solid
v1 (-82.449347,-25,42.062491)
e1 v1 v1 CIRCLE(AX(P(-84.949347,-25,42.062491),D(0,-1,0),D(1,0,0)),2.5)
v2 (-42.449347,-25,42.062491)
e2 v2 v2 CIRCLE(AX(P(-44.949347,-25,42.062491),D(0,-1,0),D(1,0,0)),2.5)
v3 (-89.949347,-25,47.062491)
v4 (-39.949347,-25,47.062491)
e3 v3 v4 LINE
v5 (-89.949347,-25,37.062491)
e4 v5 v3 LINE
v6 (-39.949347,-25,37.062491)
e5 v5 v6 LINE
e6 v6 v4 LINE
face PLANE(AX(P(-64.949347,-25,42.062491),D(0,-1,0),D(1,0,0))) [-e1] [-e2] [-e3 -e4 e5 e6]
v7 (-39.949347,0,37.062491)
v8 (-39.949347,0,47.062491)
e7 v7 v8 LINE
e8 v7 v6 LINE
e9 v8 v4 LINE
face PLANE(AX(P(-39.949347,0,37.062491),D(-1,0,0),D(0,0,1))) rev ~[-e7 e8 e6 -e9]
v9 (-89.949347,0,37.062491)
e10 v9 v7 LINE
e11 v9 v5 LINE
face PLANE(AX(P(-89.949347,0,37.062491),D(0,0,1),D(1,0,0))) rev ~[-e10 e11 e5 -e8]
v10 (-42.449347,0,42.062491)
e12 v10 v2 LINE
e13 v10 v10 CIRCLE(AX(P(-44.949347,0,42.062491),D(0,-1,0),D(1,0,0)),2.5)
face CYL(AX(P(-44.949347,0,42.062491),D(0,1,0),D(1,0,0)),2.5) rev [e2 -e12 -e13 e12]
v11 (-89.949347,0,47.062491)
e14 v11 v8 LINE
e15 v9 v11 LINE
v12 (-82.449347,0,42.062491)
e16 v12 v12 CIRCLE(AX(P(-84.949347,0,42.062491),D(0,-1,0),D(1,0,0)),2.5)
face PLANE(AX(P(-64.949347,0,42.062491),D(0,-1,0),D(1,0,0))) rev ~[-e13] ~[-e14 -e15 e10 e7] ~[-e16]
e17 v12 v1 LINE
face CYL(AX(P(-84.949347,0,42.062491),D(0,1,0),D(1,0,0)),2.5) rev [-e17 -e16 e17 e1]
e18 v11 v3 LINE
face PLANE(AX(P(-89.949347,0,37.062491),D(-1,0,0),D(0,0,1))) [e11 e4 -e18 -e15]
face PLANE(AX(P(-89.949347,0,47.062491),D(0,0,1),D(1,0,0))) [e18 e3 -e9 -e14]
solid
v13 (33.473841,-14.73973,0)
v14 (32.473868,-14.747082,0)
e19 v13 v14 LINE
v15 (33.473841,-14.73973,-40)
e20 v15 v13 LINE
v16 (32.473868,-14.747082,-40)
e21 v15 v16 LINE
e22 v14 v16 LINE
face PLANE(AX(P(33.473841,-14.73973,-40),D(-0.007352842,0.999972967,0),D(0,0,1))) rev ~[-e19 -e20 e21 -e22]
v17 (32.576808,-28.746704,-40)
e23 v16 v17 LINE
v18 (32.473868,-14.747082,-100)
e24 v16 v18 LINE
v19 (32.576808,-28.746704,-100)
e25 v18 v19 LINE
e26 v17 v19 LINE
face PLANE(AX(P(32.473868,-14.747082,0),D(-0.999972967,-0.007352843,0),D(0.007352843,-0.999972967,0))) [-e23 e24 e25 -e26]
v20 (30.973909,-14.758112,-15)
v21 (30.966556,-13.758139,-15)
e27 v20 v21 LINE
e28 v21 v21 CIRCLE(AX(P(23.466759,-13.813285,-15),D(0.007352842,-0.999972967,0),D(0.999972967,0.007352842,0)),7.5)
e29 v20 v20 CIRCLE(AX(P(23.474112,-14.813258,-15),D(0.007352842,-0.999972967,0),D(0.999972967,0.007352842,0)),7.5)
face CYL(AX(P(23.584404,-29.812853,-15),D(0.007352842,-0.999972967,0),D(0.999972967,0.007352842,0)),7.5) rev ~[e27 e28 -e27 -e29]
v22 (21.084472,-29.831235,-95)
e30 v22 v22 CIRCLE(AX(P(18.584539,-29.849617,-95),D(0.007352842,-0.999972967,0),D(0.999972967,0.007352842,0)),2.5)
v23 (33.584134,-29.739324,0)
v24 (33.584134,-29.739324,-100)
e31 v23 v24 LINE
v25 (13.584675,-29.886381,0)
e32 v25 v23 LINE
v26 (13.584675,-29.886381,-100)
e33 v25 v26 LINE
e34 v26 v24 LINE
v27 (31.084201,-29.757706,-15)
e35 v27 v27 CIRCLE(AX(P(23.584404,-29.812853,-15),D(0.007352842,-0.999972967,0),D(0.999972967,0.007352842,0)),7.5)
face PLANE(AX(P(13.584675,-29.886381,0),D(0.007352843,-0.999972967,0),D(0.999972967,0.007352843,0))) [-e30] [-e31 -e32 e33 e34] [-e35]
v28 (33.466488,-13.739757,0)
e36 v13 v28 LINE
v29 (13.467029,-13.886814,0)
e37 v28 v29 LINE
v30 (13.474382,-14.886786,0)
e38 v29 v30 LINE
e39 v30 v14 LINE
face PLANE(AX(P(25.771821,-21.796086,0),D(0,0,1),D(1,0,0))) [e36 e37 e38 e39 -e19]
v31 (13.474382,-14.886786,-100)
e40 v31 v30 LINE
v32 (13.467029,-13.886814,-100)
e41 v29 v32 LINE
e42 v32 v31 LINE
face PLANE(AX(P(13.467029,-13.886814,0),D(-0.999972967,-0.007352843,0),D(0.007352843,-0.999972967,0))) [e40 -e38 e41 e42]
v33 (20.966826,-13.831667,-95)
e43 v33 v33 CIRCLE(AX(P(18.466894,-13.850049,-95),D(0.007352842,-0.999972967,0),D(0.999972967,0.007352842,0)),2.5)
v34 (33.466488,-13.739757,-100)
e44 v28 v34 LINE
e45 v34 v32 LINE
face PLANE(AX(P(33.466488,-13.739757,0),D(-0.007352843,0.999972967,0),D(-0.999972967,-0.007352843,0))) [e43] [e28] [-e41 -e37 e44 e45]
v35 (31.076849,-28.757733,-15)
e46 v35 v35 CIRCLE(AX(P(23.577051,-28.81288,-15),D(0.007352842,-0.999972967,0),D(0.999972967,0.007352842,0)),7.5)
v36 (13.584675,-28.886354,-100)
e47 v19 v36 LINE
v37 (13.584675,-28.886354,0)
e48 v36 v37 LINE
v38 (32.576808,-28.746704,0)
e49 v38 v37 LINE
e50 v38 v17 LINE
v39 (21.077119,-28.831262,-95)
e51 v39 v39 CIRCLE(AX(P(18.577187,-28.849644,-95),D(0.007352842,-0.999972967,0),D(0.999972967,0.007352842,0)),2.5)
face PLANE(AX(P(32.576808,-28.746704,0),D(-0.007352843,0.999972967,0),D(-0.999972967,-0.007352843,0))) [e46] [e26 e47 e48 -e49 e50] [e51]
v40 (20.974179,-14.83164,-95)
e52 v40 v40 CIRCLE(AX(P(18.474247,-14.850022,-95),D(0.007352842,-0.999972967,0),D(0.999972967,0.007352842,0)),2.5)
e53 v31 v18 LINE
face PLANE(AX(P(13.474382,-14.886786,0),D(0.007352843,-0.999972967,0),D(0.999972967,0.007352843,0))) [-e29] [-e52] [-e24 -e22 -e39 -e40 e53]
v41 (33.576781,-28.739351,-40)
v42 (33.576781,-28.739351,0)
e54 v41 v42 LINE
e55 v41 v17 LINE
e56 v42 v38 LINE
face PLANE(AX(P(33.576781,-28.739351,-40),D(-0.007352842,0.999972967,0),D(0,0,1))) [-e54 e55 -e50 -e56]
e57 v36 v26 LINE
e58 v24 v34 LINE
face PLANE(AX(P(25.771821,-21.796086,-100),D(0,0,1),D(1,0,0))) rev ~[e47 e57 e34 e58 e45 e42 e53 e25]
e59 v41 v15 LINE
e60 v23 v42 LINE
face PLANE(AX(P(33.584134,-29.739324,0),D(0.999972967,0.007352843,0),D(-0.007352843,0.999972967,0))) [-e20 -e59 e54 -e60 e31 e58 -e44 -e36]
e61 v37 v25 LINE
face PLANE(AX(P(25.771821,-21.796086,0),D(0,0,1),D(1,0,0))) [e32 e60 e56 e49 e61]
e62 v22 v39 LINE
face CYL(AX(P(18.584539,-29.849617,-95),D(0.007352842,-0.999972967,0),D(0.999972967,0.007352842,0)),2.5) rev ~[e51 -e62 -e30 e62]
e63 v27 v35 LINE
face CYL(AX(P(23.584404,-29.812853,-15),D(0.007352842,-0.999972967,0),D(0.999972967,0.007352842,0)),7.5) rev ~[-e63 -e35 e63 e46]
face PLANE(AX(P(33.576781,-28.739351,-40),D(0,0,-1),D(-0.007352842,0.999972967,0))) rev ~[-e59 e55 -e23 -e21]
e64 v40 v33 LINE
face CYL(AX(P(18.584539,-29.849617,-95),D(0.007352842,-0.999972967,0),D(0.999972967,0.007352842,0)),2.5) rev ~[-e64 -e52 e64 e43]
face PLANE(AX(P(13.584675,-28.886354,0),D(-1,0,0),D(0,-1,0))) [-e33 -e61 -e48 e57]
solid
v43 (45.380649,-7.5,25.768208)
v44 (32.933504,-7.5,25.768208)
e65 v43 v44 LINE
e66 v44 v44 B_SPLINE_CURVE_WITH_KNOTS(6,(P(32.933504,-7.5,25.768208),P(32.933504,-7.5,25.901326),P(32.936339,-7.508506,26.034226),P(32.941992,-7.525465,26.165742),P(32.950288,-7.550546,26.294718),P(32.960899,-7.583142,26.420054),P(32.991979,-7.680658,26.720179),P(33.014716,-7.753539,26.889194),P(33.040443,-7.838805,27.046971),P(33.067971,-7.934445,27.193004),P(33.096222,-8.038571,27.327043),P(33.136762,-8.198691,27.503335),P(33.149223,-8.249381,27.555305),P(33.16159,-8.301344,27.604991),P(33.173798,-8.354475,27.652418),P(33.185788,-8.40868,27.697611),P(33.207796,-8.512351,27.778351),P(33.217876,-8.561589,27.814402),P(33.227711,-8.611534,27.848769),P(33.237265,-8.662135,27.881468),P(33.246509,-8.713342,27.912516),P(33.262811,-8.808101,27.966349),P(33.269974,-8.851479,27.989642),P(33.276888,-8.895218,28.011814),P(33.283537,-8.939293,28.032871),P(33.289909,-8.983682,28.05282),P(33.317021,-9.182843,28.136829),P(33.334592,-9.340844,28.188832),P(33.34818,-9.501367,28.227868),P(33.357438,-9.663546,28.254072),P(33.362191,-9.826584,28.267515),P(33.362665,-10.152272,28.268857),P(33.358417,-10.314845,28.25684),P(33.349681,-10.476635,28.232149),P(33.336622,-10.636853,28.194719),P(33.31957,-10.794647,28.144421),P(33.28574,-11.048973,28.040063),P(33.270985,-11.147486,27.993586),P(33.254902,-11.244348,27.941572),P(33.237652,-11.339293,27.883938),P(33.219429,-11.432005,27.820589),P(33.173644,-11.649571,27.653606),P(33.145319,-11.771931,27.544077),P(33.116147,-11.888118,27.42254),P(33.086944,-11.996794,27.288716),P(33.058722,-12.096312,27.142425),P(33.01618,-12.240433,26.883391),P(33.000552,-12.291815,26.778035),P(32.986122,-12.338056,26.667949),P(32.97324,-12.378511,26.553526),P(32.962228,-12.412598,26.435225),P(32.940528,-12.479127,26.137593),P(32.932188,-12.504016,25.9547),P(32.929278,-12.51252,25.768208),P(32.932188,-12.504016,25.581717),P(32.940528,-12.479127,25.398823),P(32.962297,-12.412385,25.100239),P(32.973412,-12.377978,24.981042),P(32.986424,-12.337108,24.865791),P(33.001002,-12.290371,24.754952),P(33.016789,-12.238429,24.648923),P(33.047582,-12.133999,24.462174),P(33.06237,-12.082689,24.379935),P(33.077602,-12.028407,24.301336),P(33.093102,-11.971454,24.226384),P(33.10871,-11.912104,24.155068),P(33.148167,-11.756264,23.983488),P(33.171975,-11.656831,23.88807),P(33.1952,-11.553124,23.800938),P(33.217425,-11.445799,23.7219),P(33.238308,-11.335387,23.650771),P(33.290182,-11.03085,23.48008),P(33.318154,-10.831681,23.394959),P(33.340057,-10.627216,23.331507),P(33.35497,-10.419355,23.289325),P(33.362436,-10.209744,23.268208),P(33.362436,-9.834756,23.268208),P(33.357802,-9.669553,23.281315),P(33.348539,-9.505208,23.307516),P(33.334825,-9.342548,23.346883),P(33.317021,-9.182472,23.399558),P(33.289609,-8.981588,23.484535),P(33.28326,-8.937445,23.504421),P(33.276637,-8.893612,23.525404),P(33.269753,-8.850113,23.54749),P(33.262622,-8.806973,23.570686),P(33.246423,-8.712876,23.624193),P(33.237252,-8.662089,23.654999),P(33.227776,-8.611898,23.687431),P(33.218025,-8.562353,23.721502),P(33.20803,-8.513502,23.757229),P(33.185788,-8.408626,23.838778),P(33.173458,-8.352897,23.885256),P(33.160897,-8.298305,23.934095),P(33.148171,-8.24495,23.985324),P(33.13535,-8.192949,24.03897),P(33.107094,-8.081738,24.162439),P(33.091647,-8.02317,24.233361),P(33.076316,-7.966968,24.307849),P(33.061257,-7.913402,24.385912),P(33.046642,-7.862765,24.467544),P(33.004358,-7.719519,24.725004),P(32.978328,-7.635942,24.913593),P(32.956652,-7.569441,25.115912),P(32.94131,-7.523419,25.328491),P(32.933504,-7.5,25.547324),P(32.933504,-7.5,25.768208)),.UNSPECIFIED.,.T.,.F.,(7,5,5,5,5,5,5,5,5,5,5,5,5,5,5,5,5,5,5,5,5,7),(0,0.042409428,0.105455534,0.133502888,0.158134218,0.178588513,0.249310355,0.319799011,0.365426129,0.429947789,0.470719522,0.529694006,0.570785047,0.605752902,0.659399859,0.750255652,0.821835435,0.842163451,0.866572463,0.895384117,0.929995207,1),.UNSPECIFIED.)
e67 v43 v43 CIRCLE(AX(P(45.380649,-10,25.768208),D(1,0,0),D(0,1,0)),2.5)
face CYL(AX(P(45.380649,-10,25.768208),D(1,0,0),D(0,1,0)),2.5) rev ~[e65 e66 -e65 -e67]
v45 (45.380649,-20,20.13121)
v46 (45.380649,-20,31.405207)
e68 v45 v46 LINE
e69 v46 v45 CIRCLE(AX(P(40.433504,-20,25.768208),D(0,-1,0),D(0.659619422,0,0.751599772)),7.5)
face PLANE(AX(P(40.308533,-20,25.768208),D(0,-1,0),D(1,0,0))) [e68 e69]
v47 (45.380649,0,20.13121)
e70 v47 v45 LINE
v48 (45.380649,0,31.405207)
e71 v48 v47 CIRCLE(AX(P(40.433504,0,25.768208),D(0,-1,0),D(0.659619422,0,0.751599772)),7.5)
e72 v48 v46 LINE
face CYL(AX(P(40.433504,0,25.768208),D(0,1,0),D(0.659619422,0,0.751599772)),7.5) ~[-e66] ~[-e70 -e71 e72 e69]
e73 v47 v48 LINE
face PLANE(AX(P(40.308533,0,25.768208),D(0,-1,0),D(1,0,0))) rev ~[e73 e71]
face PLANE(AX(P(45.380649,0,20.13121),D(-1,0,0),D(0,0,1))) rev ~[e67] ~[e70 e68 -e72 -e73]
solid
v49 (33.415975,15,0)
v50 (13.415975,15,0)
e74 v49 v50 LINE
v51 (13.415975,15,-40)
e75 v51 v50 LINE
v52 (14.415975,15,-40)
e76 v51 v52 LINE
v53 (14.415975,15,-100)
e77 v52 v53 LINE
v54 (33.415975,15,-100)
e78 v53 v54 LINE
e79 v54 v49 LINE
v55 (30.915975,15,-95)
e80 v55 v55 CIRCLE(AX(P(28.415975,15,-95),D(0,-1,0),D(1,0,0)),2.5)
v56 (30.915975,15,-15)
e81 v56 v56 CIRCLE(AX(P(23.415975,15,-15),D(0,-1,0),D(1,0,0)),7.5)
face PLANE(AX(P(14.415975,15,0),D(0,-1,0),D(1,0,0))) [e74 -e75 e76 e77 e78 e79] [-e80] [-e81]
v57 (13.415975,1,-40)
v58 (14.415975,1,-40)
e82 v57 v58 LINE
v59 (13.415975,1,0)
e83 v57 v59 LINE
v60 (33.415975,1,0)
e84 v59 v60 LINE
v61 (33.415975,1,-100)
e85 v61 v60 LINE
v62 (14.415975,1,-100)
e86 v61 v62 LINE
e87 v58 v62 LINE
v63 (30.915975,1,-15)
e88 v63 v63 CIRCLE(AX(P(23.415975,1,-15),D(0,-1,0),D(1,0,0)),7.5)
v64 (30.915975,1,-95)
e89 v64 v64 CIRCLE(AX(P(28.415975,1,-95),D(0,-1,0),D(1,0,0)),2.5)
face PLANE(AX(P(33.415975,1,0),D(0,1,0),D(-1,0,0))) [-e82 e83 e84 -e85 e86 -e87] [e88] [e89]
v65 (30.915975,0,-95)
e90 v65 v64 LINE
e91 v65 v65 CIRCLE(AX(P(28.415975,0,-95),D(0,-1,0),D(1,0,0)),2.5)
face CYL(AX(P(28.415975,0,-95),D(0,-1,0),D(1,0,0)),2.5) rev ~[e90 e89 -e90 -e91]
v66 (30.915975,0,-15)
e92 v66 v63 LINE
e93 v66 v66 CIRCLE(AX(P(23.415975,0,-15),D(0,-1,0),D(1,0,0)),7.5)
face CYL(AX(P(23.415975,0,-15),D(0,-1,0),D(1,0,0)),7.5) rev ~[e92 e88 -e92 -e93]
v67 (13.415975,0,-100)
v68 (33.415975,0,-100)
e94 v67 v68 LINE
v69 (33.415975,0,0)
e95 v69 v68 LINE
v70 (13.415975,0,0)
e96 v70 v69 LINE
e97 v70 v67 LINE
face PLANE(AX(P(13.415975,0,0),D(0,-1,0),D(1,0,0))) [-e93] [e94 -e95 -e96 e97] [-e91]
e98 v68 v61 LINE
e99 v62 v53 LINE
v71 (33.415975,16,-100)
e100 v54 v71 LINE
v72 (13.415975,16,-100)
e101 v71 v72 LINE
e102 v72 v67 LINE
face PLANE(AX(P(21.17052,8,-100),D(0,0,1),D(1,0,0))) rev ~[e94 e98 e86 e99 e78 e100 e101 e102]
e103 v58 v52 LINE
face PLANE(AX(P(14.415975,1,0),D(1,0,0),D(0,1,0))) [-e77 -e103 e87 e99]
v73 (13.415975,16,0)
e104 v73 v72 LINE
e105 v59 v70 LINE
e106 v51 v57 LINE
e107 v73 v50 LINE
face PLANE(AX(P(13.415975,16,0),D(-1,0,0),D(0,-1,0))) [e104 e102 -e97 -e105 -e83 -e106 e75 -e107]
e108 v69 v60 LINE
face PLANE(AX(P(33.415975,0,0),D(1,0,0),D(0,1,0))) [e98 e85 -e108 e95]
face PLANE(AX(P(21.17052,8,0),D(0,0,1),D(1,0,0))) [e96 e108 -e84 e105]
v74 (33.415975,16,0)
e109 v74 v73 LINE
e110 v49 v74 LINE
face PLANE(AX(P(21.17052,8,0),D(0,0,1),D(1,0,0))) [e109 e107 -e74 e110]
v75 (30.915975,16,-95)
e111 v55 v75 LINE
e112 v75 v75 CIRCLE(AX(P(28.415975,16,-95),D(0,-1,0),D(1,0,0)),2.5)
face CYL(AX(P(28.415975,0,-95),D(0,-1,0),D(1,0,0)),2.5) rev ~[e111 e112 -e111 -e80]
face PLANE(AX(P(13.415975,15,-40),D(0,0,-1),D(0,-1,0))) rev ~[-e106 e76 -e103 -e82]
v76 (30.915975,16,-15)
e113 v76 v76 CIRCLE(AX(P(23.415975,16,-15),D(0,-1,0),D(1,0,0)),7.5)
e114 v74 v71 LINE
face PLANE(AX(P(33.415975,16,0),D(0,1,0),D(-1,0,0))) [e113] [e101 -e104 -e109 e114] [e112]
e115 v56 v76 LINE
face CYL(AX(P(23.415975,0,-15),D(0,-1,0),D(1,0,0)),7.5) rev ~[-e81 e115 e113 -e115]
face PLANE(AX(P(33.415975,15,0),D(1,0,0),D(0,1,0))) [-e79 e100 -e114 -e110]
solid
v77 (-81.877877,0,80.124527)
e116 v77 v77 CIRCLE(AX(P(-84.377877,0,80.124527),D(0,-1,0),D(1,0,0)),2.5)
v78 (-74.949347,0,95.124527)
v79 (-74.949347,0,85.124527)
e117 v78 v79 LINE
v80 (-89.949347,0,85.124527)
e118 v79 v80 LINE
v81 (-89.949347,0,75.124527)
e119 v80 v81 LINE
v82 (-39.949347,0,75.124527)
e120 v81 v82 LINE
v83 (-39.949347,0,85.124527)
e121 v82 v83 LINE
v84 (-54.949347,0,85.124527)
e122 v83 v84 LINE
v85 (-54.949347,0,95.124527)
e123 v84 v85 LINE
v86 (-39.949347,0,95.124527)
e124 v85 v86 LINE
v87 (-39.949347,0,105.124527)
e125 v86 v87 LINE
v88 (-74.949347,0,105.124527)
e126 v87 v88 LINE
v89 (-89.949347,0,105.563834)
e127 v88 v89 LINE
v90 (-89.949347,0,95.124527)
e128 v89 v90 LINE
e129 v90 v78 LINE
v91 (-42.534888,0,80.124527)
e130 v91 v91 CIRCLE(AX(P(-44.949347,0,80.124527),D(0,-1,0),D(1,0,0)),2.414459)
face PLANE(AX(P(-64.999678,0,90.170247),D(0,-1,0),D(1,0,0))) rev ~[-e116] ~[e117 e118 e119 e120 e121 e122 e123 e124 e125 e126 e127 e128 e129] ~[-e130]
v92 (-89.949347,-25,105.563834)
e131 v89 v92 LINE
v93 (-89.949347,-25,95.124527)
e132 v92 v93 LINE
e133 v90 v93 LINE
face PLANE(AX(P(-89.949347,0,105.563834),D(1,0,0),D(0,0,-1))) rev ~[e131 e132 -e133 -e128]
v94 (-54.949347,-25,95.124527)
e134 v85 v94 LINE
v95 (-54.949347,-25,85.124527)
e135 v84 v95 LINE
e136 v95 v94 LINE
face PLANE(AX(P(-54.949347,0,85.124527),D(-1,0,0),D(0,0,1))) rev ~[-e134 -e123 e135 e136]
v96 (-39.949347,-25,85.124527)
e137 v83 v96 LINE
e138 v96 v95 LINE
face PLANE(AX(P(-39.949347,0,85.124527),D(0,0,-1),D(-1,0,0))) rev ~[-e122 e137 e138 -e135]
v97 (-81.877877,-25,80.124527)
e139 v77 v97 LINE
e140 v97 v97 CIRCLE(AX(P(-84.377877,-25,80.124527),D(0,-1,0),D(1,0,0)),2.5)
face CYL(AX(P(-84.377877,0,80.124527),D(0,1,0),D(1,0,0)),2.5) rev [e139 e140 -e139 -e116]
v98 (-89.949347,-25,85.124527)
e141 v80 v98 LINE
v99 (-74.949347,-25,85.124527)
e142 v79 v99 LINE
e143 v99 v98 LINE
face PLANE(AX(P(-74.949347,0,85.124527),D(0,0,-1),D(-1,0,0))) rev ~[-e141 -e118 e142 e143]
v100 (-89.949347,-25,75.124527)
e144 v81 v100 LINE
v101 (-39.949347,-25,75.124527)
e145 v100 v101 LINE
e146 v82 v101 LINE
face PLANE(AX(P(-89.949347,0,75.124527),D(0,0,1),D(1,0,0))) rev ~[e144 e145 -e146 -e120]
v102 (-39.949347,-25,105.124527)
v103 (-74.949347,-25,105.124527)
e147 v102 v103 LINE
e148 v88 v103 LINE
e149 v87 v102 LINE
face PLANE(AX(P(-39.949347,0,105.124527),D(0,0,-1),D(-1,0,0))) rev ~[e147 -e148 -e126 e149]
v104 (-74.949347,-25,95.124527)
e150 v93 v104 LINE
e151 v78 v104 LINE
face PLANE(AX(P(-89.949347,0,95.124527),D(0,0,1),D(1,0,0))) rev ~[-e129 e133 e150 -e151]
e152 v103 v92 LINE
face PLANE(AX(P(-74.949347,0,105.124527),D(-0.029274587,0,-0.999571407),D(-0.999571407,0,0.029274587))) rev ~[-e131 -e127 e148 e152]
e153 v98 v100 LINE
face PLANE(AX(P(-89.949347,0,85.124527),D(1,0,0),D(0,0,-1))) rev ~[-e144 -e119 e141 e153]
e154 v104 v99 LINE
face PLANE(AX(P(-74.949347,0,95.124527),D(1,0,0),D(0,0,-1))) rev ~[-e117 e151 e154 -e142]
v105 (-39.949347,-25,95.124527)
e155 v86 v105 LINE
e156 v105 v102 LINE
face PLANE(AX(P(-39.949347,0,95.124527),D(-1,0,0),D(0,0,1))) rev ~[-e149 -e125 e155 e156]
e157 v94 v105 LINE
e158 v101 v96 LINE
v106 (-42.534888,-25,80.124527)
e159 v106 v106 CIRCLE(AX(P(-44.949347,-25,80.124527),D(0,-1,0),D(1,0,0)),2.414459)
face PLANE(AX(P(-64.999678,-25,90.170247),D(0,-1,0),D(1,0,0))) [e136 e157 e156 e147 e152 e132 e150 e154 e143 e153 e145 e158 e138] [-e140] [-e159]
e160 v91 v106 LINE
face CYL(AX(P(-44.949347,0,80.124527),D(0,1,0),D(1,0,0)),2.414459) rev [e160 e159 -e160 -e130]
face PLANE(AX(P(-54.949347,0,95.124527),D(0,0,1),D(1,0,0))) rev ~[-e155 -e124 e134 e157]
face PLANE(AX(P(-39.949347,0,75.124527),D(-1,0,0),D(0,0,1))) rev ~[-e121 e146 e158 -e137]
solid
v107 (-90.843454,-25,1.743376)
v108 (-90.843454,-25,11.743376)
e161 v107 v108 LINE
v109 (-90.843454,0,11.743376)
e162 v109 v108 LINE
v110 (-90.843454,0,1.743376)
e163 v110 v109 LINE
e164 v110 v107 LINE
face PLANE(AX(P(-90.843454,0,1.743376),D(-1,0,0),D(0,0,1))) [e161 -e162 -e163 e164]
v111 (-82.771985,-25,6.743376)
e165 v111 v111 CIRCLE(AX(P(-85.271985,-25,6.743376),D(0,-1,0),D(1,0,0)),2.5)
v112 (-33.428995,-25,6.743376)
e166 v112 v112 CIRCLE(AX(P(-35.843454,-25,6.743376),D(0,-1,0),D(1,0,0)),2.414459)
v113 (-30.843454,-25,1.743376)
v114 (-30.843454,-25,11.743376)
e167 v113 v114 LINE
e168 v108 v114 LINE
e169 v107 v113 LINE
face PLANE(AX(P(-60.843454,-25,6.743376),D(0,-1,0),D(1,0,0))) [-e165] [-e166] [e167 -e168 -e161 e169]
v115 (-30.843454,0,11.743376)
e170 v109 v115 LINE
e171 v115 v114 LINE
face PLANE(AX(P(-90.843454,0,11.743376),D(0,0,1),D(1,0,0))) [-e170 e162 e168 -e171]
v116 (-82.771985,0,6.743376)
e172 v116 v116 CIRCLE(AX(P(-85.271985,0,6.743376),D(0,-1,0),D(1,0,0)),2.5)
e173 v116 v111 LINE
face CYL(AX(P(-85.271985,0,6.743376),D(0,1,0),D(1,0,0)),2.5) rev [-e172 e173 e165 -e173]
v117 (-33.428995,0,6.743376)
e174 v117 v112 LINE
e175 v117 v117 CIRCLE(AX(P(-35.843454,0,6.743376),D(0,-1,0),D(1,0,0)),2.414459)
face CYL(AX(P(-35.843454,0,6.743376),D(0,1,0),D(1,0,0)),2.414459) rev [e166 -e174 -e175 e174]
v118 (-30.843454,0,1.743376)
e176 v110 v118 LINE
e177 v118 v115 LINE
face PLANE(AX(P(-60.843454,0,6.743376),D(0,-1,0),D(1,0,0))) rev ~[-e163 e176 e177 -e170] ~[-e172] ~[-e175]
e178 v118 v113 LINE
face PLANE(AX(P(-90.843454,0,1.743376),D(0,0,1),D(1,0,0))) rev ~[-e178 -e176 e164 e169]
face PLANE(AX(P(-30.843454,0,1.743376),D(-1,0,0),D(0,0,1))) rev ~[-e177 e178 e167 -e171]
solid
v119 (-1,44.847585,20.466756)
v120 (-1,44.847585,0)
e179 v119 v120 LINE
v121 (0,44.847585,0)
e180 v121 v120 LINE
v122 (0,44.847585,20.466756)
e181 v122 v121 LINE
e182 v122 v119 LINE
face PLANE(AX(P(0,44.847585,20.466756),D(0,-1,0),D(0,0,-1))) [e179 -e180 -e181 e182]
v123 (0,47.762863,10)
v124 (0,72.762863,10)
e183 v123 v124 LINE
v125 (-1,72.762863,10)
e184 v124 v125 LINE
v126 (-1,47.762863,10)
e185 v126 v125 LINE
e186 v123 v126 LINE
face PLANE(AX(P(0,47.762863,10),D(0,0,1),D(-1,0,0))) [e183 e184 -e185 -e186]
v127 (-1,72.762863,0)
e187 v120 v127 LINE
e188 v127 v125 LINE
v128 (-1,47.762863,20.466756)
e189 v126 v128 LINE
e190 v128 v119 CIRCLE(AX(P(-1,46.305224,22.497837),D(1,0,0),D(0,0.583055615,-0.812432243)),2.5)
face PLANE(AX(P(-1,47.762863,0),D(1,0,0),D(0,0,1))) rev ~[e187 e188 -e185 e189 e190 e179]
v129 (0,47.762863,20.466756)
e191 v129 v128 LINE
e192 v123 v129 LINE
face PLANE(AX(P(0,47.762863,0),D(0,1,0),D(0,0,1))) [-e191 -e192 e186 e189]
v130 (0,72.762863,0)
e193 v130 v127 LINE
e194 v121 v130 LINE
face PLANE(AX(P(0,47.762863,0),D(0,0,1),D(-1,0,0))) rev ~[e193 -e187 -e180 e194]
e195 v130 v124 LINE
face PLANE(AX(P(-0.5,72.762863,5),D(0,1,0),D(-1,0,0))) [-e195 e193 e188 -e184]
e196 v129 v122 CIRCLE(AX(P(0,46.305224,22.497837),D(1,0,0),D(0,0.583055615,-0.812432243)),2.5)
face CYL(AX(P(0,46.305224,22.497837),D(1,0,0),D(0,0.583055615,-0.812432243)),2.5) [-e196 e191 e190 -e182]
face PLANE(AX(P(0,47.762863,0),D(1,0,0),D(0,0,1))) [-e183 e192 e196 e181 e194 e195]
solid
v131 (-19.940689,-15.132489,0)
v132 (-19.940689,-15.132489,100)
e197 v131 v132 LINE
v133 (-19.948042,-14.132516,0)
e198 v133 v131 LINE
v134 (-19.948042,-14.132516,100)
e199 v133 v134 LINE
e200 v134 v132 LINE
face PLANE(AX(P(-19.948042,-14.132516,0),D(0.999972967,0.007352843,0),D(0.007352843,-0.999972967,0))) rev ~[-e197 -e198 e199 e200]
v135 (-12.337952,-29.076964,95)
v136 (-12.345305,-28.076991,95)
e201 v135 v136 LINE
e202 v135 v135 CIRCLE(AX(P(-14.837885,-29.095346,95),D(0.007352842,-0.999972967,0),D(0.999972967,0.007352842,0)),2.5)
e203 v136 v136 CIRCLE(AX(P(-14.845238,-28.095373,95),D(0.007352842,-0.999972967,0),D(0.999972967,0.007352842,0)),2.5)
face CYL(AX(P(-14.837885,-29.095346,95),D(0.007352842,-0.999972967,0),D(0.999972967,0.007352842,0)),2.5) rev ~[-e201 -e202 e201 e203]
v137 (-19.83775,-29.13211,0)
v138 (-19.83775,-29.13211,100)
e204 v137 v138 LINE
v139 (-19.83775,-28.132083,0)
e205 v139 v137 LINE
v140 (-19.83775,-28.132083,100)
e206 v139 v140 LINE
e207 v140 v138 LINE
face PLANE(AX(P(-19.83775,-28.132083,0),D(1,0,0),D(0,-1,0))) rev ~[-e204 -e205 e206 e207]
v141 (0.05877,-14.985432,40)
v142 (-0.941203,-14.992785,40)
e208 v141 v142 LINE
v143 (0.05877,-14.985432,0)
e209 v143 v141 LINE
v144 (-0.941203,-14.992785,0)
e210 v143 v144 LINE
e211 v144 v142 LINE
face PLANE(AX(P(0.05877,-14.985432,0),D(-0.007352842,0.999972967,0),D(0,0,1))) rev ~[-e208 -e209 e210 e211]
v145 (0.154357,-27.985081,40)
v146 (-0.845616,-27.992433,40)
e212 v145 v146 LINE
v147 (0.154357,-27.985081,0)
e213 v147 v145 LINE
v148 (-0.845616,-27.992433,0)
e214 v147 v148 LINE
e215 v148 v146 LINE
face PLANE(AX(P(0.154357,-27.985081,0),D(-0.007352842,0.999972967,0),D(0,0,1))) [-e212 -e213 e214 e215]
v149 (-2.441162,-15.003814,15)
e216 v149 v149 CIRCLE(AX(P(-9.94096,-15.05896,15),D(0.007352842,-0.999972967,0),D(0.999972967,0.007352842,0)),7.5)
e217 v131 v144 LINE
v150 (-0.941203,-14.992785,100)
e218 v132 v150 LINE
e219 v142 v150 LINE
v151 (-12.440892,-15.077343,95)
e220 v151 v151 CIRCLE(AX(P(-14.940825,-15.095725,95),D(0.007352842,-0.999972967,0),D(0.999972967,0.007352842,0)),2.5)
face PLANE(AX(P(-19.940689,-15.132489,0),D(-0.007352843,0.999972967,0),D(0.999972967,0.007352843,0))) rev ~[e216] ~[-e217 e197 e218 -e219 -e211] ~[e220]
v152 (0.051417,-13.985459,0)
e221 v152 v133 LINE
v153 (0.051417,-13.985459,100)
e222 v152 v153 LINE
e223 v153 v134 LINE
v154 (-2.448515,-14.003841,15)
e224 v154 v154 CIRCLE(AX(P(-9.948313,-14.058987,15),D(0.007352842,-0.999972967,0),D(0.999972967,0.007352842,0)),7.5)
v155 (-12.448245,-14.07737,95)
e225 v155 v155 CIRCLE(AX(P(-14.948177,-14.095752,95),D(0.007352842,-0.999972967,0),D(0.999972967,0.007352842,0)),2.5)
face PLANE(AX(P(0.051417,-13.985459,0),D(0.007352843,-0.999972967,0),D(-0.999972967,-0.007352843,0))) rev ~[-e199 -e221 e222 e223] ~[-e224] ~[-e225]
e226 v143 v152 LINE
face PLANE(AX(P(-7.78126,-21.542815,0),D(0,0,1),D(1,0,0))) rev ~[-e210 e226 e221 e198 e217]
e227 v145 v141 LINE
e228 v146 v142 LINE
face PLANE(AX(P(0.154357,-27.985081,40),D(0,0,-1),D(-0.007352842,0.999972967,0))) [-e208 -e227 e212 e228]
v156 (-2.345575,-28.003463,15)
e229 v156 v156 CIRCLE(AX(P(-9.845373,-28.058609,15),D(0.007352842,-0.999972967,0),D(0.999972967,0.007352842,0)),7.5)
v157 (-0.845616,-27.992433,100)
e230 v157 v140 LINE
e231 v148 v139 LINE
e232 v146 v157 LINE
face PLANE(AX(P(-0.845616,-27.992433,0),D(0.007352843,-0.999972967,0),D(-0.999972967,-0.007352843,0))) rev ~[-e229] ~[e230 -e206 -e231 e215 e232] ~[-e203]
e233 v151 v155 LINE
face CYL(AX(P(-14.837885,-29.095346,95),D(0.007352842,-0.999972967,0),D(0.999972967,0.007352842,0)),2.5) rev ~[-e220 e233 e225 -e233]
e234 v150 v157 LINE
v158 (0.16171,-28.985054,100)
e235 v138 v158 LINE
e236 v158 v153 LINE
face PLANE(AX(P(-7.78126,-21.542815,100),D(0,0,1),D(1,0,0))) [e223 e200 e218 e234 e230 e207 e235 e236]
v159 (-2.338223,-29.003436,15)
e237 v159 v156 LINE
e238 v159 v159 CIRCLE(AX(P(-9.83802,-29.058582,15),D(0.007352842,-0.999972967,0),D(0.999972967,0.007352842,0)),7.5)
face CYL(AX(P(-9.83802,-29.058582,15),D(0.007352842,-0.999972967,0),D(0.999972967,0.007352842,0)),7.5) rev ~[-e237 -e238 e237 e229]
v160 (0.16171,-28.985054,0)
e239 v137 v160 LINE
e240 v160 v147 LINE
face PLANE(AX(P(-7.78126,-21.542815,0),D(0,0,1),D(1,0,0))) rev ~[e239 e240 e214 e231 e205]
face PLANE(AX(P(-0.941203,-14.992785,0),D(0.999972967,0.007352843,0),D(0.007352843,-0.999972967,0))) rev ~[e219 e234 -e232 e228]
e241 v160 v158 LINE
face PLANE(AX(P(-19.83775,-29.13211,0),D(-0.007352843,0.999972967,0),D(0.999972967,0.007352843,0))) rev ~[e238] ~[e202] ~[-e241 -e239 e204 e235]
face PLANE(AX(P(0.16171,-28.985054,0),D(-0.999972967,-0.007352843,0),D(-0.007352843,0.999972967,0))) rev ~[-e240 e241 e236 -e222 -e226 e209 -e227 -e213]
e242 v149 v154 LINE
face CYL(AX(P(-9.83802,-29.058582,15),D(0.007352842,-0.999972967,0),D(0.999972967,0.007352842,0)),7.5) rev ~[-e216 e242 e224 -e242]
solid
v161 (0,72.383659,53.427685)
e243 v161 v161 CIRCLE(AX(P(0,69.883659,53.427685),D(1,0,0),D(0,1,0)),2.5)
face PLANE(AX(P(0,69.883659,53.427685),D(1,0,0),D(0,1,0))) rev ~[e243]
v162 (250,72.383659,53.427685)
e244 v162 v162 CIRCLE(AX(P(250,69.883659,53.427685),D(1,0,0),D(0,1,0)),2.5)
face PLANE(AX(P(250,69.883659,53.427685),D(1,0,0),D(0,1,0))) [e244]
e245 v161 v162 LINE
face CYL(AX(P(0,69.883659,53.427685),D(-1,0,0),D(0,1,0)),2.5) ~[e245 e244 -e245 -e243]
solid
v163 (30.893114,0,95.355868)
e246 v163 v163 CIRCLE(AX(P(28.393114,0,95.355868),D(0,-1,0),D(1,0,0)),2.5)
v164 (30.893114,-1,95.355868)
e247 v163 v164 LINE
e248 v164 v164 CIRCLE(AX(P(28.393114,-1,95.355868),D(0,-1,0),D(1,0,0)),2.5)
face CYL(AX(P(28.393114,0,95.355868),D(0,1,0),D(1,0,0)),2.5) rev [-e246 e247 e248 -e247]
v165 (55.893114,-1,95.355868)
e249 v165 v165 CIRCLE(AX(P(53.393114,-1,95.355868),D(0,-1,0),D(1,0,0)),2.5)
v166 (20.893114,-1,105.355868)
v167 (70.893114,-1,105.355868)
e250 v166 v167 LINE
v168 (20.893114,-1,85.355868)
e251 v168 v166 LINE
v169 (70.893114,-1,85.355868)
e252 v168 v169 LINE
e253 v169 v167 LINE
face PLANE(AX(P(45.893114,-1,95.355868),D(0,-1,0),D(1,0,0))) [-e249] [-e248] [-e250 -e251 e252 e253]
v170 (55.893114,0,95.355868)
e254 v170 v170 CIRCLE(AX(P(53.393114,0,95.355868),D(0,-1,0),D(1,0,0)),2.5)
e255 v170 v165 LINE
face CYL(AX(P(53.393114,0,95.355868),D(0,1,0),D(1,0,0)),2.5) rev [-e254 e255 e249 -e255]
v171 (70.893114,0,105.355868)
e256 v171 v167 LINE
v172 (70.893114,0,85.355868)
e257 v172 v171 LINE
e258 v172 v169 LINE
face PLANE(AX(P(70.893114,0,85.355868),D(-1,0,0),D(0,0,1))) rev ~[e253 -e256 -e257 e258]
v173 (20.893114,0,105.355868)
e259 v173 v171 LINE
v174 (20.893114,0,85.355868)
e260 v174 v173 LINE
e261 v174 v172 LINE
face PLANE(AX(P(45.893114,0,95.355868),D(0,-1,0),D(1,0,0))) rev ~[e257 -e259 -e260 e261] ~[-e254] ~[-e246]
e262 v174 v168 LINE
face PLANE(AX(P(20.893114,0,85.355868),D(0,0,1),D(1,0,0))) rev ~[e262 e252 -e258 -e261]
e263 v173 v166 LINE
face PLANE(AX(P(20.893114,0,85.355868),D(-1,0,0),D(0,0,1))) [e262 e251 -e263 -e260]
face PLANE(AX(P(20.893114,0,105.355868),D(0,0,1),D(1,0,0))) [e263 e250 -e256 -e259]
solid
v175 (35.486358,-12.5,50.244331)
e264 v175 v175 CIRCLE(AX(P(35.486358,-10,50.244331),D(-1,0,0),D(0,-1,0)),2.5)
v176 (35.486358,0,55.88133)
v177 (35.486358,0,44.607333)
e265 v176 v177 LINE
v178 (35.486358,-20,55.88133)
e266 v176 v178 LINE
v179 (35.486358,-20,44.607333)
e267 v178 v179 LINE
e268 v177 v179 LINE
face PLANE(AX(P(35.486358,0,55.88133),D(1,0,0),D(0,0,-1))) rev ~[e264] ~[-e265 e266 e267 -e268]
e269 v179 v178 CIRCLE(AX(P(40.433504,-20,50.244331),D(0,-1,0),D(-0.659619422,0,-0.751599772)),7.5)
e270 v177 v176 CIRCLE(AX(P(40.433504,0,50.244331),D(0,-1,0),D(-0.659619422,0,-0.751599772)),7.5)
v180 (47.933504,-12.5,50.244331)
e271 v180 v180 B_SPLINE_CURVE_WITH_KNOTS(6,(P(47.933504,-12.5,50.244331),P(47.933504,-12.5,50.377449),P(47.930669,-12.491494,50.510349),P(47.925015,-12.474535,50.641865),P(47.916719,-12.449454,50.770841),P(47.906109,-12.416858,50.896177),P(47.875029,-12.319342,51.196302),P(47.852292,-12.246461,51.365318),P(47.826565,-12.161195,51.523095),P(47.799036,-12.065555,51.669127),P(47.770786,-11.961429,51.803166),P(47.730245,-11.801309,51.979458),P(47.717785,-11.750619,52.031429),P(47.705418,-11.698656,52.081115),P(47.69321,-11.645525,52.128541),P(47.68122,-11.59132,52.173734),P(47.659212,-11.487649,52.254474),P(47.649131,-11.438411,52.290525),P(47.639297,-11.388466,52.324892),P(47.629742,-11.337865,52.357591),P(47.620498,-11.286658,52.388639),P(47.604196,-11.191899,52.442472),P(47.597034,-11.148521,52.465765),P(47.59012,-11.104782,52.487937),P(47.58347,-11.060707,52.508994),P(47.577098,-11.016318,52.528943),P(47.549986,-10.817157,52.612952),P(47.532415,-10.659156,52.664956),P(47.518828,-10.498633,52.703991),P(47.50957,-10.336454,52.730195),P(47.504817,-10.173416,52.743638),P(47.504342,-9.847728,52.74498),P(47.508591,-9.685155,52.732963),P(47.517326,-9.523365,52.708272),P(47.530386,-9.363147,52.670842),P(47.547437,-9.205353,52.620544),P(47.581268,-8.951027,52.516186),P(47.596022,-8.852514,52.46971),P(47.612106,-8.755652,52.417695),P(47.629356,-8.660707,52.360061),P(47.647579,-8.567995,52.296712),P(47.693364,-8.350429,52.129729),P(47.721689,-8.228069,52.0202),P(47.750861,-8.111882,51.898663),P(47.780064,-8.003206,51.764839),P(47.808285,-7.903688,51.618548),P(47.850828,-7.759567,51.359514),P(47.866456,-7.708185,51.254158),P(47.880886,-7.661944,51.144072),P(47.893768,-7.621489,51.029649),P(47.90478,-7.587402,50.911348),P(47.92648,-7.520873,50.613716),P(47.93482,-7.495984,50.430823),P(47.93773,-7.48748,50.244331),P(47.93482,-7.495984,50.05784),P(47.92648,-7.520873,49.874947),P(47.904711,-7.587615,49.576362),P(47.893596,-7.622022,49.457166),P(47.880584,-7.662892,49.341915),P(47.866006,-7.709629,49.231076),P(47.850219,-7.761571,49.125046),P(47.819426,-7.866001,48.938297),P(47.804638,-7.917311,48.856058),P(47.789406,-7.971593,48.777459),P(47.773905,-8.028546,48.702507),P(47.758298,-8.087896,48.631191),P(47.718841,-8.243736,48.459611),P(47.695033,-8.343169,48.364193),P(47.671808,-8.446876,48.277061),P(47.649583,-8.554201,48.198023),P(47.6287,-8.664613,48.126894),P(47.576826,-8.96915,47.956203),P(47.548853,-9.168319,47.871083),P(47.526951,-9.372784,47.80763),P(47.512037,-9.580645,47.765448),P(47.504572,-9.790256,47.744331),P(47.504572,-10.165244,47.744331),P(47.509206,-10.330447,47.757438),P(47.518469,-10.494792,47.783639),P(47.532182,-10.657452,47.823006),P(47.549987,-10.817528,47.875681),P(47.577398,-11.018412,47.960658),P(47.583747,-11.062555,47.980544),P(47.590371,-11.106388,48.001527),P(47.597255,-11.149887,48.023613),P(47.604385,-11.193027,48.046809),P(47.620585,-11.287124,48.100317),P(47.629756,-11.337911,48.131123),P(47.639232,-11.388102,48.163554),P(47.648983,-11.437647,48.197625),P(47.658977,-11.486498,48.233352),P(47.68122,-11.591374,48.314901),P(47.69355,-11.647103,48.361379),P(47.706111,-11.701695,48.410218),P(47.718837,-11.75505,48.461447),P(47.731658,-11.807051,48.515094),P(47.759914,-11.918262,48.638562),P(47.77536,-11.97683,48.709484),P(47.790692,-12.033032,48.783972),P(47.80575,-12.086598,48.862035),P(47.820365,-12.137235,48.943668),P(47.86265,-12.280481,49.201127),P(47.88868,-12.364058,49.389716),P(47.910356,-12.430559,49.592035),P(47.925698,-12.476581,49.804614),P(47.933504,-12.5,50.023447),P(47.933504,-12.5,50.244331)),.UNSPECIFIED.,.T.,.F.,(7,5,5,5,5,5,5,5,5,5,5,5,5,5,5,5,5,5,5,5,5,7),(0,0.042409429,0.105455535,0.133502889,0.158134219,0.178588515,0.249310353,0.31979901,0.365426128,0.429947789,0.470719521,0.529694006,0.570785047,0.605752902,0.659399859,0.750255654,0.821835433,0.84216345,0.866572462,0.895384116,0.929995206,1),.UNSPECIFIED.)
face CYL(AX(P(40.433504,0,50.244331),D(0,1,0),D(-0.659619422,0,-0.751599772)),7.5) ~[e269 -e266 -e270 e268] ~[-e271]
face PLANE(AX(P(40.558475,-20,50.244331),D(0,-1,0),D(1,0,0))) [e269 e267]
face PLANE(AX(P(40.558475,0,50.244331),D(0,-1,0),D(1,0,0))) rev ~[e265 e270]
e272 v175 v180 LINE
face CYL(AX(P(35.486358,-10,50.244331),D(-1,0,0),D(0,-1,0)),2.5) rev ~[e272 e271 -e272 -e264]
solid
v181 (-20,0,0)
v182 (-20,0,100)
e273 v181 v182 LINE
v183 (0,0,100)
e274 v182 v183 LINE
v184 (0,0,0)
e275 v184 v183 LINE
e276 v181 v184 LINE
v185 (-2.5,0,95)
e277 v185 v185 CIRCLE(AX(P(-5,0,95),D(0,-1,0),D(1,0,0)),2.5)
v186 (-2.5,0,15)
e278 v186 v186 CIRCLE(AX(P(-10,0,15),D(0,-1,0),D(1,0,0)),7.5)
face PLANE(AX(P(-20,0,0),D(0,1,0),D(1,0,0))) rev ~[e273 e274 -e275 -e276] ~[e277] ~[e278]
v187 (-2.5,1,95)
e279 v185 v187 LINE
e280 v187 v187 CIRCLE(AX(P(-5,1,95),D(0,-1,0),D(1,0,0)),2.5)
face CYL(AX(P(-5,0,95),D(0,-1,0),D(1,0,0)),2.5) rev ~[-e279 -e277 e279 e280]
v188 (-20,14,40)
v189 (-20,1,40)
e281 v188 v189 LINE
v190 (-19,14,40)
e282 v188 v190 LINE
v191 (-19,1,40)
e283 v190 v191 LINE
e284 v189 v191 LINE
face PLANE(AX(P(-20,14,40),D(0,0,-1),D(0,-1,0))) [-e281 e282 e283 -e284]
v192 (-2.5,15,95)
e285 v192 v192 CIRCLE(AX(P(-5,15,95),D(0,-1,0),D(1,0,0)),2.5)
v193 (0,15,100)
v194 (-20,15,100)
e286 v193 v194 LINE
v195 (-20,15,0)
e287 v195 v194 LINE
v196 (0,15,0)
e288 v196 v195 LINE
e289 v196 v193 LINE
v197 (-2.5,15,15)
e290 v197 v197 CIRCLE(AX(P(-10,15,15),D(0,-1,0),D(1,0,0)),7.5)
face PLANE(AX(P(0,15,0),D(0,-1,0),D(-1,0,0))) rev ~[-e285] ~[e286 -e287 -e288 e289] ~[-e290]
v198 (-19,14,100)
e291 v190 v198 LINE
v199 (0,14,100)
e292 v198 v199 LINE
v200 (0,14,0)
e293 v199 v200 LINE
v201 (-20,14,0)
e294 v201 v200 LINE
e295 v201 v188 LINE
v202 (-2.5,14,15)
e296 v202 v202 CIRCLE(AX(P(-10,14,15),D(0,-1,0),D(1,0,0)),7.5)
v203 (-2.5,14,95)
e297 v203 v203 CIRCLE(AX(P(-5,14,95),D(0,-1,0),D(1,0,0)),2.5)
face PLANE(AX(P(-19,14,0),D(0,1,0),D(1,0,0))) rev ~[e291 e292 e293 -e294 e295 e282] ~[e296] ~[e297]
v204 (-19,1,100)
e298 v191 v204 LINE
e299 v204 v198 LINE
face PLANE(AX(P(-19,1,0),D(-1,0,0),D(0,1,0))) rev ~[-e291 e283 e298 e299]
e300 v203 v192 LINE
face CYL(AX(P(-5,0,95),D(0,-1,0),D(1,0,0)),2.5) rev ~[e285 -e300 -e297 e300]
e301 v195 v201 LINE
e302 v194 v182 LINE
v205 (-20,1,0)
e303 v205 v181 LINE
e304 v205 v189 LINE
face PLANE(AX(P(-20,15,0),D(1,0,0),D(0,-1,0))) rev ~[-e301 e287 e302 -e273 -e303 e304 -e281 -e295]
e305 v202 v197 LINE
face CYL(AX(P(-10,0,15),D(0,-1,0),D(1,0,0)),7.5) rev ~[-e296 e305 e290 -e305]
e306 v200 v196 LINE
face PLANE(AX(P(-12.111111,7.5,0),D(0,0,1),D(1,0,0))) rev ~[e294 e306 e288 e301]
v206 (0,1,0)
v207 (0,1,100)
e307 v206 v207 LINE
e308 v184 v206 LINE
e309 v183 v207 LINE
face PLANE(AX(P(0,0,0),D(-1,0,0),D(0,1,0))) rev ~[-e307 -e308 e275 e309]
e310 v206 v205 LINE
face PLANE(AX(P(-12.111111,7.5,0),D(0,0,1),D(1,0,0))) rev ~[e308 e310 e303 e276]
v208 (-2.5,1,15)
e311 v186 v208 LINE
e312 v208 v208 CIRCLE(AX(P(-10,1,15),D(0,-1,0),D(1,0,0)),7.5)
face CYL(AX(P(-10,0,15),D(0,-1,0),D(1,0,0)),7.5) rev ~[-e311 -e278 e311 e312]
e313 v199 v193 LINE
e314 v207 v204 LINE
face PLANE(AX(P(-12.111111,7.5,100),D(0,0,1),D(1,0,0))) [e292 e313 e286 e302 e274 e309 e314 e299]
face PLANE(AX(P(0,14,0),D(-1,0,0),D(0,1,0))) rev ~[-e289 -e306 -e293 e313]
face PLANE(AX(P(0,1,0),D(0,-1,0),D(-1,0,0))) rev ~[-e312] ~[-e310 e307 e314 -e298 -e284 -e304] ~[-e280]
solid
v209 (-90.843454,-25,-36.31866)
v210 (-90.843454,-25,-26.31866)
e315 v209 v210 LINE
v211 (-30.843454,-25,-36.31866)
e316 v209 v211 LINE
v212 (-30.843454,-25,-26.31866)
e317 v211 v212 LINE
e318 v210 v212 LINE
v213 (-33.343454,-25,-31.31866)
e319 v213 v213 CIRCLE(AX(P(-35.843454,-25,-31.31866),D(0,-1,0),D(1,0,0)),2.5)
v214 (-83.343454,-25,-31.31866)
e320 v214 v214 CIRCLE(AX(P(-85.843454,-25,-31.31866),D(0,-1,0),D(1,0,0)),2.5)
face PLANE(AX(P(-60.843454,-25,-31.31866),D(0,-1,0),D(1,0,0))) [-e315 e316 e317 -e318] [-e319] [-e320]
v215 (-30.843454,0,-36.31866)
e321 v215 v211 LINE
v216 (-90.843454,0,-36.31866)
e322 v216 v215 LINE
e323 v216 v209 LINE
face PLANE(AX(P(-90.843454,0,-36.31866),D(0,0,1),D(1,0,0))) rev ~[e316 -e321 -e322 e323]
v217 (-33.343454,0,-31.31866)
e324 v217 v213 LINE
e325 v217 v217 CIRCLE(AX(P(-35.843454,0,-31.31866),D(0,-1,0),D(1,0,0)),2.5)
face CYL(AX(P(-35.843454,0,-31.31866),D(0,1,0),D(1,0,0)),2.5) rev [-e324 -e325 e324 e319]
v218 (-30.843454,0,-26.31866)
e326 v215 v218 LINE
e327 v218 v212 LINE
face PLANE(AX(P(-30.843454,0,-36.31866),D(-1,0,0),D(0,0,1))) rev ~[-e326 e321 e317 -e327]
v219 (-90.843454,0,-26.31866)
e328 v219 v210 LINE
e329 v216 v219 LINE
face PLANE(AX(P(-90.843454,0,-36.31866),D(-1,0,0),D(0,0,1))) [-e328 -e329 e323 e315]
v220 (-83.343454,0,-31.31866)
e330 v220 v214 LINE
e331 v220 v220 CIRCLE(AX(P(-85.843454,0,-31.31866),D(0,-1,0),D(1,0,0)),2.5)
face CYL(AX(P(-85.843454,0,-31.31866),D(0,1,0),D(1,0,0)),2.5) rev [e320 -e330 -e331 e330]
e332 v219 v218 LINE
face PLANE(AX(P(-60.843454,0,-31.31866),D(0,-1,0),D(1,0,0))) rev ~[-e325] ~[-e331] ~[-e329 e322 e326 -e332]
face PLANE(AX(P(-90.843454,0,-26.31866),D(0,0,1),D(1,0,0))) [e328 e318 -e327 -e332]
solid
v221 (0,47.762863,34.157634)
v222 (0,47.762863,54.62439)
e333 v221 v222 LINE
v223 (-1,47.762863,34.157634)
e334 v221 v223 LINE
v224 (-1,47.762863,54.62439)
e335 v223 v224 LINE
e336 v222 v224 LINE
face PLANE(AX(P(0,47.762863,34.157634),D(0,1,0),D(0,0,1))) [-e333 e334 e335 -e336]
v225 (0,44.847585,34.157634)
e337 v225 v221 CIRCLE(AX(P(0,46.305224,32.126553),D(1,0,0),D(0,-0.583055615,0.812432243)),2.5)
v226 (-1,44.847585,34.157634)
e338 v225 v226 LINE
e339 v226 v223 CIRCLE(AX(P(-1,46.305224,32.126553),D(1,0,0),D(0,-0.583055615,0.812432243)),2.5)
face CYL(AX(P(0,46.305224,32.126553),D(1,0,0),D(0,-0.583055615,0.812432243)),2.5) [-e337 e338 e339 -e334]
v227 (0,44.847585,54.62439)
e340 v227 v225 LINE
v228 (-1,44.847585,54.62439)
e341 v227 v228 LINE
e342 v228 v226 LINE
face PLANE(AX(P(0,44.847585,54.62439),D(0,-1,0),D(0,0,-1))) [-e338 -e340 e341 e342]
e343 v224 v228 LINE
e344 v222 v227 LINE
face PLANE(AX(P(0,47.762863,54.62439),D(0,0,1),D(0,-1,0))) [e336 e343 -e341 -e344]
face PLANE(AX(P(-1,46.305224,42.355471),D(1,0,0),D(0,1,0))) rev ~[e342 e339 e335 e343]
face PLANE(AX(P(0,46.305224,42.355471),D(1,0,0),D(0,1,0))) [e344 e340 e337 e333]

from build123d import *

# Parameters (mm, degrees)
F1_DEPTH  = 100
F2_R      = 7.5
F2_R_2    = 2.5
F3_DEPTH  = 15.001
F4_W      = 13
F4_H      = 40
F5_DEPTH  = 20.1627097718
F6_DEPTH  = 100
F7_R      = 7.5
F7_R_2    = 2.5
F8_DEPTH  = 16.001
F9_W      = 14
F9_H      = 40
F10_DEPTH = 20.1691592966
F11_W     = 50
F11_H     = 20
F11_R     = 2.5
F12_DEPTH = 1
F13_R     = 2.5
F13_R_2   = 7.5
F14_DEPTH = 45.1330833913
F15_R     = 7.5
F15_R_2   = 2.5
F16_DEPTH = 46.1330833913
F17_W     = 14
F17_H     = 40
F18_DEPTH = 53.5847666336
F19_W     = 13
F19_H     = 40
F20_DEPTH = 25
F22_DEPTH = 20
F23_R     = 2.5
F24_DEPTH = 250
F25_W     = 50
F25_H     = 10
F25_R     = 2.5
F26_DEPTH = 25
F25_R_2   = 2.4144593705
F25_W_2   = 60
F27_DEPTH = 25
F28_R     = 2.5
F29_DEPTH = 136.2251037518
F30_R     = 2.5
F31_DEPTH = 214.5146418358
F33_DEPTH = 1
F34_W     = 1
F34_H     = 10
F35_DEPTH = 25


# Not quite as in the source:
# - a feature names something its author has since deleted; it is built from what else it names


with BuildPart() as f1:
    # F0 (on Top) → F1 (new body)
    with BuildSketch(Plane.XY):
        Polygon((0, 14), (0, 15), (-20, 15), (-20, 0), (0, 0), (0, 1), (-19, 1), (-19, 14), align=None)
    extrude(amount=F1_DEPTH)

    # F2 (on face) → F3 (cut, through all)
    with BuildSketch(Plane.XZ):
        with Locations((-10, 15)):
            Circle(F2_R)
        with Locations((-5, 95)):
            Circle(F2_R_2)
    extrude(amount=-F3_DEPTH, mode=Mode.SUBTRACT)

    # F4 (on face) → F5 (cut, through all)
    with BuildSketch(Plane(origin=(-20, 0, 0), x_dir=(0, -1, 0), z_dir=(-1, 0, 0))):
        with Locations((-7.5, 20)):
            Rectangle(F4_W, F4_H)
    extrude(amount=-F5_DEPTH, mode=Mode.SUBTRACT)


with BuildPart() as f1b:
    # F0 (on Top) → F1, piece 2 (new body)
    with BuildSketch(Plane.XY):
        Polygon((0.051417134, -13.985459061), (-19.9480422158, -14.1325159114), (-19.9406893732, -15.1324888789), (-0.941202991, -14.992784871), (-0.8456160382, -27.9924334484), (-19.837749578, -28.1320833905), (-19.837749578, -29.1321104238), (0.1617097718, -28.9850535734), align=None)
    extrude(amount=F1_DEPTH)

    # F13 (on face) → F14 (cut, through all)
    with BuildSketch(Plane(origin=(0.2131255159, -28.9846755113, 0), x_dir=(0.9999729675, 0.0073528425, 0), z_dir=(0.0073528425, -0.9999729675, 0))):
        with Locations((-15.051417134, 95)):
            Circle(F13_R)
        with Locations((-10.051417134, 15)):
            Circle(F13_R_2)
    extrude(amount=-F14_DEPTH, mode=Mode.SUBTRACT)

    # F19 (on face) → F20 (cut)
    with BuildSketch(Plane(origin=(-0.0514157441, -0.0003780621, 0), x_dir=(-0.0073528425, 0.9999729675, 0), z_dir=(0.9999729675, 0.0073528425, 0))):
        with Locations((-21.485459061, 20)):
            Rectangle(F19_W, F19_H)
    extrude(amount=-F20_DEPTH, mode=Mode.SUBTRACT)


with BuildPart() as f6:
    # F0 (on Top) → F6 (new body)
    with BuildSketch(Plane.XY):
        Polygon((33.4159745649, 0), (33.4159745649, 1), (14.4159745649, 1), (14.4159745649, 15), (33.4159745649, 15), (33.4159745649, 16), (13.4159745649, 16), (13.4159745649, 0), align=None)
    extrude(amount=-F6_DEPTH)

    # F7 (on face) → F8 (cut, through all)
    with BuildSketch(Plane.XZ):
        with Locations((23.4159745649, -15)):
            Circle(F7_R)
        with Locations((28.4159745649, -95)):
            Circle(F7_R_2)
    extrude(amount=-F8_DEPTH, mode=Mode.SUBTRACT)

    # F9 (on face) → F10 (cut, through all)
    with BuildSketch(Plane(origin=(13.4159745649, 0, 0), x_dir=(0, -1, 0), z_dir=(-1, 0, 0))):
        with Locations((-8, -20)):
            Rectangle(F9_W, F9_H)
    extrude(amount=-F10_DEPTH, mode=Mode.SUBTRACT)


with BuildPart() as f6b:
    # F0 (on Top) → F6, piece 2 (new body)
    with BuildSketch(Plane.XY):
        Polygon((33.4664883811, -13.7397566624), (13.4670290313, -13.8868135128), (13.4743818739, -14.8867864803), (32.4738682561, -14.7470824724), (32.5768080514, -28.7467040172), (13.5846745117, -28.8863539594), (13.5846745117, -29.8863809926), (33.5841338614, -29.7393241422), align=None)
    extrude(amount=-F6_DEPTH)

    # F15 (on face) → F16 (cut, through all)
    with BuildSketch(Plane(origin=(0.2204783584, -29.9846484788, 0), x_dir=(0.9999729675, 0.0073528425, 0), z_dir=(0.0073528425, -0.9999729675, 0))):
        with Locations((23.3645574309, -15)):
            Circle(F15_R)
        with Locations((18.3645574309, -95)):
            Circle(F15_R_2)
    extrude(amount=-F16_DEPTH, mode=Mode.SUBTRACT)

    # F17 (on face) → F18 (cut, through all)
    with BuildSketch(Plane(origin=(33.3636555031, 0.2453243365, 0), x_dir=(-0.0073528425, 0.9999729675, 0), z_dir=(0.9999729675, 0.0073528425, 0))):
        with Locations((-21.985459061, -20)):
            Rectangle(F17_W, F17_H)
    extrude(amount=-F18_DEPTH, mode=Mode.SUBTRACT)


with BuildPart() as f12:
    # F11 (on Front) → F12 (new body)
    with BuildSketch(Plane.XZ):
        with Locations((45.8931141218, 95.3558683395)):
            Rectangle(F11_W, F11_H)
        with Locations((28.3931141218, 95.3558683395)):
            Circle(F11_R, mode=Mode.SUBTRACT)
        with Locations((53.3931141218, 95.3558683395)):
            Circle(F11_R, mode=Mode.SUBTRACT)
    extrude(amount=F12_DEPTH)


with BuildPart() as f22:
    # F21 (on Front) → F22 (new body)
    with BuildSketch(Plane.XZ):
        with BuildLine():
            Line((35.4863581642, 55.8813297105), (35.4863581642, 44.6073331245))
            ThreePointArc((35.4863581642, 44.6073331245), (47.9335038306, 50.2443314175), (35.4863581642, 55.8813297105))
        make_face()
    extrude(amount=F22_DEPTH)

    # F30 (on face) → F31 (cut, through all)
    with BuildSketch(Plane(origin=(35.4863581642, 0, 0), x_dir=(0, -1, 0), z_dir=(-1, 0, 0))):
        with Locations((10, 50.2443314175)):
            Circle(F30_R)
    extrude(amount=-F31_DEPTH, mode=Mode.SUBTRACT)


with BuildPart() as f22b:
    # F21 (on Front) → F22, piece 2 (new body)
    with BuildSketch(Plane.XZ):
        with BuildLine():
            Line((45.380649497, 20.1312099156), (45.380649497, 31.4052065016))
            ThreePointArc((45.380649497, 31.4052065016), (32.9335038306, 25.7682082086), (45.380649497, 20.1312099156))
        make_face()
    extrude(amount=F22_DEPTH)

    # F28 (on face) → F29 (cut, through all)
    with BuildSketch(Plane.YZ.offset(45.380649497)):
        with Locations((-10, 25.7682082086)):
            Circle(F28_R)
    extrude(amount=-F29_DEPTH, mode=Mode.SUBTRACT)


with BuildPart() as f24:
    # F23 (on Right) → F24 (new body)
    with BuildSketch(Plane.YZ):
        with Locations((69.883659482, 53.4276850522)):
            Circle(F23_R)
    extrude(amount=F24_DEPTH)


with BuildPart() as f26:
    # F25 (on Front) → F26 (new body)
    with BuildSketch(Plane.XZ):
        with Locations((-64.9493469292, 42.0624911785)):
            Rectangle(F25_W, F25_H)
        with Locations((-84.9493469292, 42.0624911785)):
            Circle(F25_R, mode=Mode.SUBTRACT)
        with Locations((-44.9493469292, 42.0624911785)):
            Circle(F25_R, mode=Mode.SUBTRACT)
    extrude(amount=F26_DEPTH)


with BuildPart() as f26b:
    # F25 (on Front) → F26, piece 2 (new body)
    with BuildSketch(Plane.XZ):
        Polygon((-89.9493469292, 85.124527216), (-89.9493469292, 75.124527216), (-39.9493469292, 75.124527216), (-39.9493469292, 85.124527216), (-54.9493469292, 85.124527216), (-54.9493469292, 95.124527216), (-39.9493469292, 95.124527216), (-39.9493469292, 105.124527216), (-54.9493469292, 105.124527216), (-64.9493469292, 105.124527216), (-74.9493469292, 105.124527216), (-89.9493469292, 105.5638343096), (-89.9493469292, 95.124527216), (-74.9493469292, 95.124527216), (-74.9493469292, 85.124527216), align=None)
        with Locations((-84.3778774142, 80.124527216)):
            Circle(F25_R, mode=Mode.SUBTRACT)
        with Locations((-44.9493469292, 80.124527216)):
            Circle(F25_R_2, mode=Mode.SUBTRACT)
    extrude(amount=F26_DEPTH)


with BuildPart() as f27:
    # F25 (on Front) → F27 (new body)
    with BuildSketch(Plane.XZ):
        with Locations((-60.8434542548, -31.3186603598)):
            Rectangle(F25_W_2, F25_H)
        with Locations((-85.8434542548, -31.3186603598)):
            Circle(F25_R, mode=Mode.SUBTRACT)
        with Locations((-35.8434542548, -31.3186603598)):
            Circle(F25_R, mode=Mode.SUBTRACT)
    extrude(amount=F27_DEPTH)


with BuildPart() as f27b:
    # F25 (on Front) → F27, piece 2 (new body)
    with BuildSketch(Plane.XZ):
        with Locations((-60.8434542548, 6.7433756776)):
            Rectangle(F25_W_2, F25_H)
        with Locations((-85.2719847398, 6.7433756776)):
            Circle(F25_R, mode=Mode.SUBTRACT)
        with Locations((-35.8434542548, 6.7433756776)):
            Circle(F25_R_2, mode=Mode.SUBTRACT)
    extrude(amount=F27_DEPTH)


with BuildPart() as f33:
    # F32 (on Right) → F33 (new body)
    with BuildSketch(Plane.YZ):
        with BuildLine():
            Line((47.762863338, 8.6800148711), (47.762863338, 20.4667558931))
            ThreePointArc((47.762863338, 20.4667558931), (46.3052242994, 24.9978365004), (44.8475852609, 20.4667558931))
            Line((44.8475852609, 20.4667558931), (44.8475852609, 8.6800148711))
            Line((44.8475852609, 8.6800148711), (44.8475852609, 0))
            Line((44.8475852609, 0), (47.762863338, 0))
            Line((47.762863338, 0), (47.762863338, 8.6800148711))
        make_face()
    extrude(amount=-F33_DEPTH)

    # F34 (on face) → F35 (join)
    with BuildSketch(Plane(origin=(0, 47.762863338, 0), x_dir=(-1, 0, 0), z_dir=(0, 1, 0))):
        with Locations((0.5, 5)):
            Rectangle(F34_W, F34_H)
    extrude(amount=F35_DEPTH)


with BuildPart() as f33b:
    # F32 (on Right) → F33, piece 2 (new body)
    with BuildSketch(Plane.YZ):
        with BuildLine():
            ThreePointArc((44.8475852609, 34.1576339639), (46.3052242994, 29.6265533566), (47.762863338, 34.1576339639))
            Line((47.762863338, 34.1576339639), (47.762863338, 45.944374986))
            Line((47.762863338, 45.944374986), (47.762863338, 54.6243898571))
            Line((47.762863338, 54.6243898571), (44.8475852609, 54.6243898571))
            Line((44.8475852609, 54.6243898571), (44.8475852609, 45.944374986))
            Line((44.8475852609, 45.944374986), (44.8475852609, 34.1576339639))
        make_face()
    extrude(amount=-F33_DEPTH)


solid = Compound([f1.part, f1b.part, f6.part, f6b.part, f12.part, f22.part, f22b.part, f24.part, f26.part, f26b.part, f27.part, f27b.part, f33.part, f33b.part])
